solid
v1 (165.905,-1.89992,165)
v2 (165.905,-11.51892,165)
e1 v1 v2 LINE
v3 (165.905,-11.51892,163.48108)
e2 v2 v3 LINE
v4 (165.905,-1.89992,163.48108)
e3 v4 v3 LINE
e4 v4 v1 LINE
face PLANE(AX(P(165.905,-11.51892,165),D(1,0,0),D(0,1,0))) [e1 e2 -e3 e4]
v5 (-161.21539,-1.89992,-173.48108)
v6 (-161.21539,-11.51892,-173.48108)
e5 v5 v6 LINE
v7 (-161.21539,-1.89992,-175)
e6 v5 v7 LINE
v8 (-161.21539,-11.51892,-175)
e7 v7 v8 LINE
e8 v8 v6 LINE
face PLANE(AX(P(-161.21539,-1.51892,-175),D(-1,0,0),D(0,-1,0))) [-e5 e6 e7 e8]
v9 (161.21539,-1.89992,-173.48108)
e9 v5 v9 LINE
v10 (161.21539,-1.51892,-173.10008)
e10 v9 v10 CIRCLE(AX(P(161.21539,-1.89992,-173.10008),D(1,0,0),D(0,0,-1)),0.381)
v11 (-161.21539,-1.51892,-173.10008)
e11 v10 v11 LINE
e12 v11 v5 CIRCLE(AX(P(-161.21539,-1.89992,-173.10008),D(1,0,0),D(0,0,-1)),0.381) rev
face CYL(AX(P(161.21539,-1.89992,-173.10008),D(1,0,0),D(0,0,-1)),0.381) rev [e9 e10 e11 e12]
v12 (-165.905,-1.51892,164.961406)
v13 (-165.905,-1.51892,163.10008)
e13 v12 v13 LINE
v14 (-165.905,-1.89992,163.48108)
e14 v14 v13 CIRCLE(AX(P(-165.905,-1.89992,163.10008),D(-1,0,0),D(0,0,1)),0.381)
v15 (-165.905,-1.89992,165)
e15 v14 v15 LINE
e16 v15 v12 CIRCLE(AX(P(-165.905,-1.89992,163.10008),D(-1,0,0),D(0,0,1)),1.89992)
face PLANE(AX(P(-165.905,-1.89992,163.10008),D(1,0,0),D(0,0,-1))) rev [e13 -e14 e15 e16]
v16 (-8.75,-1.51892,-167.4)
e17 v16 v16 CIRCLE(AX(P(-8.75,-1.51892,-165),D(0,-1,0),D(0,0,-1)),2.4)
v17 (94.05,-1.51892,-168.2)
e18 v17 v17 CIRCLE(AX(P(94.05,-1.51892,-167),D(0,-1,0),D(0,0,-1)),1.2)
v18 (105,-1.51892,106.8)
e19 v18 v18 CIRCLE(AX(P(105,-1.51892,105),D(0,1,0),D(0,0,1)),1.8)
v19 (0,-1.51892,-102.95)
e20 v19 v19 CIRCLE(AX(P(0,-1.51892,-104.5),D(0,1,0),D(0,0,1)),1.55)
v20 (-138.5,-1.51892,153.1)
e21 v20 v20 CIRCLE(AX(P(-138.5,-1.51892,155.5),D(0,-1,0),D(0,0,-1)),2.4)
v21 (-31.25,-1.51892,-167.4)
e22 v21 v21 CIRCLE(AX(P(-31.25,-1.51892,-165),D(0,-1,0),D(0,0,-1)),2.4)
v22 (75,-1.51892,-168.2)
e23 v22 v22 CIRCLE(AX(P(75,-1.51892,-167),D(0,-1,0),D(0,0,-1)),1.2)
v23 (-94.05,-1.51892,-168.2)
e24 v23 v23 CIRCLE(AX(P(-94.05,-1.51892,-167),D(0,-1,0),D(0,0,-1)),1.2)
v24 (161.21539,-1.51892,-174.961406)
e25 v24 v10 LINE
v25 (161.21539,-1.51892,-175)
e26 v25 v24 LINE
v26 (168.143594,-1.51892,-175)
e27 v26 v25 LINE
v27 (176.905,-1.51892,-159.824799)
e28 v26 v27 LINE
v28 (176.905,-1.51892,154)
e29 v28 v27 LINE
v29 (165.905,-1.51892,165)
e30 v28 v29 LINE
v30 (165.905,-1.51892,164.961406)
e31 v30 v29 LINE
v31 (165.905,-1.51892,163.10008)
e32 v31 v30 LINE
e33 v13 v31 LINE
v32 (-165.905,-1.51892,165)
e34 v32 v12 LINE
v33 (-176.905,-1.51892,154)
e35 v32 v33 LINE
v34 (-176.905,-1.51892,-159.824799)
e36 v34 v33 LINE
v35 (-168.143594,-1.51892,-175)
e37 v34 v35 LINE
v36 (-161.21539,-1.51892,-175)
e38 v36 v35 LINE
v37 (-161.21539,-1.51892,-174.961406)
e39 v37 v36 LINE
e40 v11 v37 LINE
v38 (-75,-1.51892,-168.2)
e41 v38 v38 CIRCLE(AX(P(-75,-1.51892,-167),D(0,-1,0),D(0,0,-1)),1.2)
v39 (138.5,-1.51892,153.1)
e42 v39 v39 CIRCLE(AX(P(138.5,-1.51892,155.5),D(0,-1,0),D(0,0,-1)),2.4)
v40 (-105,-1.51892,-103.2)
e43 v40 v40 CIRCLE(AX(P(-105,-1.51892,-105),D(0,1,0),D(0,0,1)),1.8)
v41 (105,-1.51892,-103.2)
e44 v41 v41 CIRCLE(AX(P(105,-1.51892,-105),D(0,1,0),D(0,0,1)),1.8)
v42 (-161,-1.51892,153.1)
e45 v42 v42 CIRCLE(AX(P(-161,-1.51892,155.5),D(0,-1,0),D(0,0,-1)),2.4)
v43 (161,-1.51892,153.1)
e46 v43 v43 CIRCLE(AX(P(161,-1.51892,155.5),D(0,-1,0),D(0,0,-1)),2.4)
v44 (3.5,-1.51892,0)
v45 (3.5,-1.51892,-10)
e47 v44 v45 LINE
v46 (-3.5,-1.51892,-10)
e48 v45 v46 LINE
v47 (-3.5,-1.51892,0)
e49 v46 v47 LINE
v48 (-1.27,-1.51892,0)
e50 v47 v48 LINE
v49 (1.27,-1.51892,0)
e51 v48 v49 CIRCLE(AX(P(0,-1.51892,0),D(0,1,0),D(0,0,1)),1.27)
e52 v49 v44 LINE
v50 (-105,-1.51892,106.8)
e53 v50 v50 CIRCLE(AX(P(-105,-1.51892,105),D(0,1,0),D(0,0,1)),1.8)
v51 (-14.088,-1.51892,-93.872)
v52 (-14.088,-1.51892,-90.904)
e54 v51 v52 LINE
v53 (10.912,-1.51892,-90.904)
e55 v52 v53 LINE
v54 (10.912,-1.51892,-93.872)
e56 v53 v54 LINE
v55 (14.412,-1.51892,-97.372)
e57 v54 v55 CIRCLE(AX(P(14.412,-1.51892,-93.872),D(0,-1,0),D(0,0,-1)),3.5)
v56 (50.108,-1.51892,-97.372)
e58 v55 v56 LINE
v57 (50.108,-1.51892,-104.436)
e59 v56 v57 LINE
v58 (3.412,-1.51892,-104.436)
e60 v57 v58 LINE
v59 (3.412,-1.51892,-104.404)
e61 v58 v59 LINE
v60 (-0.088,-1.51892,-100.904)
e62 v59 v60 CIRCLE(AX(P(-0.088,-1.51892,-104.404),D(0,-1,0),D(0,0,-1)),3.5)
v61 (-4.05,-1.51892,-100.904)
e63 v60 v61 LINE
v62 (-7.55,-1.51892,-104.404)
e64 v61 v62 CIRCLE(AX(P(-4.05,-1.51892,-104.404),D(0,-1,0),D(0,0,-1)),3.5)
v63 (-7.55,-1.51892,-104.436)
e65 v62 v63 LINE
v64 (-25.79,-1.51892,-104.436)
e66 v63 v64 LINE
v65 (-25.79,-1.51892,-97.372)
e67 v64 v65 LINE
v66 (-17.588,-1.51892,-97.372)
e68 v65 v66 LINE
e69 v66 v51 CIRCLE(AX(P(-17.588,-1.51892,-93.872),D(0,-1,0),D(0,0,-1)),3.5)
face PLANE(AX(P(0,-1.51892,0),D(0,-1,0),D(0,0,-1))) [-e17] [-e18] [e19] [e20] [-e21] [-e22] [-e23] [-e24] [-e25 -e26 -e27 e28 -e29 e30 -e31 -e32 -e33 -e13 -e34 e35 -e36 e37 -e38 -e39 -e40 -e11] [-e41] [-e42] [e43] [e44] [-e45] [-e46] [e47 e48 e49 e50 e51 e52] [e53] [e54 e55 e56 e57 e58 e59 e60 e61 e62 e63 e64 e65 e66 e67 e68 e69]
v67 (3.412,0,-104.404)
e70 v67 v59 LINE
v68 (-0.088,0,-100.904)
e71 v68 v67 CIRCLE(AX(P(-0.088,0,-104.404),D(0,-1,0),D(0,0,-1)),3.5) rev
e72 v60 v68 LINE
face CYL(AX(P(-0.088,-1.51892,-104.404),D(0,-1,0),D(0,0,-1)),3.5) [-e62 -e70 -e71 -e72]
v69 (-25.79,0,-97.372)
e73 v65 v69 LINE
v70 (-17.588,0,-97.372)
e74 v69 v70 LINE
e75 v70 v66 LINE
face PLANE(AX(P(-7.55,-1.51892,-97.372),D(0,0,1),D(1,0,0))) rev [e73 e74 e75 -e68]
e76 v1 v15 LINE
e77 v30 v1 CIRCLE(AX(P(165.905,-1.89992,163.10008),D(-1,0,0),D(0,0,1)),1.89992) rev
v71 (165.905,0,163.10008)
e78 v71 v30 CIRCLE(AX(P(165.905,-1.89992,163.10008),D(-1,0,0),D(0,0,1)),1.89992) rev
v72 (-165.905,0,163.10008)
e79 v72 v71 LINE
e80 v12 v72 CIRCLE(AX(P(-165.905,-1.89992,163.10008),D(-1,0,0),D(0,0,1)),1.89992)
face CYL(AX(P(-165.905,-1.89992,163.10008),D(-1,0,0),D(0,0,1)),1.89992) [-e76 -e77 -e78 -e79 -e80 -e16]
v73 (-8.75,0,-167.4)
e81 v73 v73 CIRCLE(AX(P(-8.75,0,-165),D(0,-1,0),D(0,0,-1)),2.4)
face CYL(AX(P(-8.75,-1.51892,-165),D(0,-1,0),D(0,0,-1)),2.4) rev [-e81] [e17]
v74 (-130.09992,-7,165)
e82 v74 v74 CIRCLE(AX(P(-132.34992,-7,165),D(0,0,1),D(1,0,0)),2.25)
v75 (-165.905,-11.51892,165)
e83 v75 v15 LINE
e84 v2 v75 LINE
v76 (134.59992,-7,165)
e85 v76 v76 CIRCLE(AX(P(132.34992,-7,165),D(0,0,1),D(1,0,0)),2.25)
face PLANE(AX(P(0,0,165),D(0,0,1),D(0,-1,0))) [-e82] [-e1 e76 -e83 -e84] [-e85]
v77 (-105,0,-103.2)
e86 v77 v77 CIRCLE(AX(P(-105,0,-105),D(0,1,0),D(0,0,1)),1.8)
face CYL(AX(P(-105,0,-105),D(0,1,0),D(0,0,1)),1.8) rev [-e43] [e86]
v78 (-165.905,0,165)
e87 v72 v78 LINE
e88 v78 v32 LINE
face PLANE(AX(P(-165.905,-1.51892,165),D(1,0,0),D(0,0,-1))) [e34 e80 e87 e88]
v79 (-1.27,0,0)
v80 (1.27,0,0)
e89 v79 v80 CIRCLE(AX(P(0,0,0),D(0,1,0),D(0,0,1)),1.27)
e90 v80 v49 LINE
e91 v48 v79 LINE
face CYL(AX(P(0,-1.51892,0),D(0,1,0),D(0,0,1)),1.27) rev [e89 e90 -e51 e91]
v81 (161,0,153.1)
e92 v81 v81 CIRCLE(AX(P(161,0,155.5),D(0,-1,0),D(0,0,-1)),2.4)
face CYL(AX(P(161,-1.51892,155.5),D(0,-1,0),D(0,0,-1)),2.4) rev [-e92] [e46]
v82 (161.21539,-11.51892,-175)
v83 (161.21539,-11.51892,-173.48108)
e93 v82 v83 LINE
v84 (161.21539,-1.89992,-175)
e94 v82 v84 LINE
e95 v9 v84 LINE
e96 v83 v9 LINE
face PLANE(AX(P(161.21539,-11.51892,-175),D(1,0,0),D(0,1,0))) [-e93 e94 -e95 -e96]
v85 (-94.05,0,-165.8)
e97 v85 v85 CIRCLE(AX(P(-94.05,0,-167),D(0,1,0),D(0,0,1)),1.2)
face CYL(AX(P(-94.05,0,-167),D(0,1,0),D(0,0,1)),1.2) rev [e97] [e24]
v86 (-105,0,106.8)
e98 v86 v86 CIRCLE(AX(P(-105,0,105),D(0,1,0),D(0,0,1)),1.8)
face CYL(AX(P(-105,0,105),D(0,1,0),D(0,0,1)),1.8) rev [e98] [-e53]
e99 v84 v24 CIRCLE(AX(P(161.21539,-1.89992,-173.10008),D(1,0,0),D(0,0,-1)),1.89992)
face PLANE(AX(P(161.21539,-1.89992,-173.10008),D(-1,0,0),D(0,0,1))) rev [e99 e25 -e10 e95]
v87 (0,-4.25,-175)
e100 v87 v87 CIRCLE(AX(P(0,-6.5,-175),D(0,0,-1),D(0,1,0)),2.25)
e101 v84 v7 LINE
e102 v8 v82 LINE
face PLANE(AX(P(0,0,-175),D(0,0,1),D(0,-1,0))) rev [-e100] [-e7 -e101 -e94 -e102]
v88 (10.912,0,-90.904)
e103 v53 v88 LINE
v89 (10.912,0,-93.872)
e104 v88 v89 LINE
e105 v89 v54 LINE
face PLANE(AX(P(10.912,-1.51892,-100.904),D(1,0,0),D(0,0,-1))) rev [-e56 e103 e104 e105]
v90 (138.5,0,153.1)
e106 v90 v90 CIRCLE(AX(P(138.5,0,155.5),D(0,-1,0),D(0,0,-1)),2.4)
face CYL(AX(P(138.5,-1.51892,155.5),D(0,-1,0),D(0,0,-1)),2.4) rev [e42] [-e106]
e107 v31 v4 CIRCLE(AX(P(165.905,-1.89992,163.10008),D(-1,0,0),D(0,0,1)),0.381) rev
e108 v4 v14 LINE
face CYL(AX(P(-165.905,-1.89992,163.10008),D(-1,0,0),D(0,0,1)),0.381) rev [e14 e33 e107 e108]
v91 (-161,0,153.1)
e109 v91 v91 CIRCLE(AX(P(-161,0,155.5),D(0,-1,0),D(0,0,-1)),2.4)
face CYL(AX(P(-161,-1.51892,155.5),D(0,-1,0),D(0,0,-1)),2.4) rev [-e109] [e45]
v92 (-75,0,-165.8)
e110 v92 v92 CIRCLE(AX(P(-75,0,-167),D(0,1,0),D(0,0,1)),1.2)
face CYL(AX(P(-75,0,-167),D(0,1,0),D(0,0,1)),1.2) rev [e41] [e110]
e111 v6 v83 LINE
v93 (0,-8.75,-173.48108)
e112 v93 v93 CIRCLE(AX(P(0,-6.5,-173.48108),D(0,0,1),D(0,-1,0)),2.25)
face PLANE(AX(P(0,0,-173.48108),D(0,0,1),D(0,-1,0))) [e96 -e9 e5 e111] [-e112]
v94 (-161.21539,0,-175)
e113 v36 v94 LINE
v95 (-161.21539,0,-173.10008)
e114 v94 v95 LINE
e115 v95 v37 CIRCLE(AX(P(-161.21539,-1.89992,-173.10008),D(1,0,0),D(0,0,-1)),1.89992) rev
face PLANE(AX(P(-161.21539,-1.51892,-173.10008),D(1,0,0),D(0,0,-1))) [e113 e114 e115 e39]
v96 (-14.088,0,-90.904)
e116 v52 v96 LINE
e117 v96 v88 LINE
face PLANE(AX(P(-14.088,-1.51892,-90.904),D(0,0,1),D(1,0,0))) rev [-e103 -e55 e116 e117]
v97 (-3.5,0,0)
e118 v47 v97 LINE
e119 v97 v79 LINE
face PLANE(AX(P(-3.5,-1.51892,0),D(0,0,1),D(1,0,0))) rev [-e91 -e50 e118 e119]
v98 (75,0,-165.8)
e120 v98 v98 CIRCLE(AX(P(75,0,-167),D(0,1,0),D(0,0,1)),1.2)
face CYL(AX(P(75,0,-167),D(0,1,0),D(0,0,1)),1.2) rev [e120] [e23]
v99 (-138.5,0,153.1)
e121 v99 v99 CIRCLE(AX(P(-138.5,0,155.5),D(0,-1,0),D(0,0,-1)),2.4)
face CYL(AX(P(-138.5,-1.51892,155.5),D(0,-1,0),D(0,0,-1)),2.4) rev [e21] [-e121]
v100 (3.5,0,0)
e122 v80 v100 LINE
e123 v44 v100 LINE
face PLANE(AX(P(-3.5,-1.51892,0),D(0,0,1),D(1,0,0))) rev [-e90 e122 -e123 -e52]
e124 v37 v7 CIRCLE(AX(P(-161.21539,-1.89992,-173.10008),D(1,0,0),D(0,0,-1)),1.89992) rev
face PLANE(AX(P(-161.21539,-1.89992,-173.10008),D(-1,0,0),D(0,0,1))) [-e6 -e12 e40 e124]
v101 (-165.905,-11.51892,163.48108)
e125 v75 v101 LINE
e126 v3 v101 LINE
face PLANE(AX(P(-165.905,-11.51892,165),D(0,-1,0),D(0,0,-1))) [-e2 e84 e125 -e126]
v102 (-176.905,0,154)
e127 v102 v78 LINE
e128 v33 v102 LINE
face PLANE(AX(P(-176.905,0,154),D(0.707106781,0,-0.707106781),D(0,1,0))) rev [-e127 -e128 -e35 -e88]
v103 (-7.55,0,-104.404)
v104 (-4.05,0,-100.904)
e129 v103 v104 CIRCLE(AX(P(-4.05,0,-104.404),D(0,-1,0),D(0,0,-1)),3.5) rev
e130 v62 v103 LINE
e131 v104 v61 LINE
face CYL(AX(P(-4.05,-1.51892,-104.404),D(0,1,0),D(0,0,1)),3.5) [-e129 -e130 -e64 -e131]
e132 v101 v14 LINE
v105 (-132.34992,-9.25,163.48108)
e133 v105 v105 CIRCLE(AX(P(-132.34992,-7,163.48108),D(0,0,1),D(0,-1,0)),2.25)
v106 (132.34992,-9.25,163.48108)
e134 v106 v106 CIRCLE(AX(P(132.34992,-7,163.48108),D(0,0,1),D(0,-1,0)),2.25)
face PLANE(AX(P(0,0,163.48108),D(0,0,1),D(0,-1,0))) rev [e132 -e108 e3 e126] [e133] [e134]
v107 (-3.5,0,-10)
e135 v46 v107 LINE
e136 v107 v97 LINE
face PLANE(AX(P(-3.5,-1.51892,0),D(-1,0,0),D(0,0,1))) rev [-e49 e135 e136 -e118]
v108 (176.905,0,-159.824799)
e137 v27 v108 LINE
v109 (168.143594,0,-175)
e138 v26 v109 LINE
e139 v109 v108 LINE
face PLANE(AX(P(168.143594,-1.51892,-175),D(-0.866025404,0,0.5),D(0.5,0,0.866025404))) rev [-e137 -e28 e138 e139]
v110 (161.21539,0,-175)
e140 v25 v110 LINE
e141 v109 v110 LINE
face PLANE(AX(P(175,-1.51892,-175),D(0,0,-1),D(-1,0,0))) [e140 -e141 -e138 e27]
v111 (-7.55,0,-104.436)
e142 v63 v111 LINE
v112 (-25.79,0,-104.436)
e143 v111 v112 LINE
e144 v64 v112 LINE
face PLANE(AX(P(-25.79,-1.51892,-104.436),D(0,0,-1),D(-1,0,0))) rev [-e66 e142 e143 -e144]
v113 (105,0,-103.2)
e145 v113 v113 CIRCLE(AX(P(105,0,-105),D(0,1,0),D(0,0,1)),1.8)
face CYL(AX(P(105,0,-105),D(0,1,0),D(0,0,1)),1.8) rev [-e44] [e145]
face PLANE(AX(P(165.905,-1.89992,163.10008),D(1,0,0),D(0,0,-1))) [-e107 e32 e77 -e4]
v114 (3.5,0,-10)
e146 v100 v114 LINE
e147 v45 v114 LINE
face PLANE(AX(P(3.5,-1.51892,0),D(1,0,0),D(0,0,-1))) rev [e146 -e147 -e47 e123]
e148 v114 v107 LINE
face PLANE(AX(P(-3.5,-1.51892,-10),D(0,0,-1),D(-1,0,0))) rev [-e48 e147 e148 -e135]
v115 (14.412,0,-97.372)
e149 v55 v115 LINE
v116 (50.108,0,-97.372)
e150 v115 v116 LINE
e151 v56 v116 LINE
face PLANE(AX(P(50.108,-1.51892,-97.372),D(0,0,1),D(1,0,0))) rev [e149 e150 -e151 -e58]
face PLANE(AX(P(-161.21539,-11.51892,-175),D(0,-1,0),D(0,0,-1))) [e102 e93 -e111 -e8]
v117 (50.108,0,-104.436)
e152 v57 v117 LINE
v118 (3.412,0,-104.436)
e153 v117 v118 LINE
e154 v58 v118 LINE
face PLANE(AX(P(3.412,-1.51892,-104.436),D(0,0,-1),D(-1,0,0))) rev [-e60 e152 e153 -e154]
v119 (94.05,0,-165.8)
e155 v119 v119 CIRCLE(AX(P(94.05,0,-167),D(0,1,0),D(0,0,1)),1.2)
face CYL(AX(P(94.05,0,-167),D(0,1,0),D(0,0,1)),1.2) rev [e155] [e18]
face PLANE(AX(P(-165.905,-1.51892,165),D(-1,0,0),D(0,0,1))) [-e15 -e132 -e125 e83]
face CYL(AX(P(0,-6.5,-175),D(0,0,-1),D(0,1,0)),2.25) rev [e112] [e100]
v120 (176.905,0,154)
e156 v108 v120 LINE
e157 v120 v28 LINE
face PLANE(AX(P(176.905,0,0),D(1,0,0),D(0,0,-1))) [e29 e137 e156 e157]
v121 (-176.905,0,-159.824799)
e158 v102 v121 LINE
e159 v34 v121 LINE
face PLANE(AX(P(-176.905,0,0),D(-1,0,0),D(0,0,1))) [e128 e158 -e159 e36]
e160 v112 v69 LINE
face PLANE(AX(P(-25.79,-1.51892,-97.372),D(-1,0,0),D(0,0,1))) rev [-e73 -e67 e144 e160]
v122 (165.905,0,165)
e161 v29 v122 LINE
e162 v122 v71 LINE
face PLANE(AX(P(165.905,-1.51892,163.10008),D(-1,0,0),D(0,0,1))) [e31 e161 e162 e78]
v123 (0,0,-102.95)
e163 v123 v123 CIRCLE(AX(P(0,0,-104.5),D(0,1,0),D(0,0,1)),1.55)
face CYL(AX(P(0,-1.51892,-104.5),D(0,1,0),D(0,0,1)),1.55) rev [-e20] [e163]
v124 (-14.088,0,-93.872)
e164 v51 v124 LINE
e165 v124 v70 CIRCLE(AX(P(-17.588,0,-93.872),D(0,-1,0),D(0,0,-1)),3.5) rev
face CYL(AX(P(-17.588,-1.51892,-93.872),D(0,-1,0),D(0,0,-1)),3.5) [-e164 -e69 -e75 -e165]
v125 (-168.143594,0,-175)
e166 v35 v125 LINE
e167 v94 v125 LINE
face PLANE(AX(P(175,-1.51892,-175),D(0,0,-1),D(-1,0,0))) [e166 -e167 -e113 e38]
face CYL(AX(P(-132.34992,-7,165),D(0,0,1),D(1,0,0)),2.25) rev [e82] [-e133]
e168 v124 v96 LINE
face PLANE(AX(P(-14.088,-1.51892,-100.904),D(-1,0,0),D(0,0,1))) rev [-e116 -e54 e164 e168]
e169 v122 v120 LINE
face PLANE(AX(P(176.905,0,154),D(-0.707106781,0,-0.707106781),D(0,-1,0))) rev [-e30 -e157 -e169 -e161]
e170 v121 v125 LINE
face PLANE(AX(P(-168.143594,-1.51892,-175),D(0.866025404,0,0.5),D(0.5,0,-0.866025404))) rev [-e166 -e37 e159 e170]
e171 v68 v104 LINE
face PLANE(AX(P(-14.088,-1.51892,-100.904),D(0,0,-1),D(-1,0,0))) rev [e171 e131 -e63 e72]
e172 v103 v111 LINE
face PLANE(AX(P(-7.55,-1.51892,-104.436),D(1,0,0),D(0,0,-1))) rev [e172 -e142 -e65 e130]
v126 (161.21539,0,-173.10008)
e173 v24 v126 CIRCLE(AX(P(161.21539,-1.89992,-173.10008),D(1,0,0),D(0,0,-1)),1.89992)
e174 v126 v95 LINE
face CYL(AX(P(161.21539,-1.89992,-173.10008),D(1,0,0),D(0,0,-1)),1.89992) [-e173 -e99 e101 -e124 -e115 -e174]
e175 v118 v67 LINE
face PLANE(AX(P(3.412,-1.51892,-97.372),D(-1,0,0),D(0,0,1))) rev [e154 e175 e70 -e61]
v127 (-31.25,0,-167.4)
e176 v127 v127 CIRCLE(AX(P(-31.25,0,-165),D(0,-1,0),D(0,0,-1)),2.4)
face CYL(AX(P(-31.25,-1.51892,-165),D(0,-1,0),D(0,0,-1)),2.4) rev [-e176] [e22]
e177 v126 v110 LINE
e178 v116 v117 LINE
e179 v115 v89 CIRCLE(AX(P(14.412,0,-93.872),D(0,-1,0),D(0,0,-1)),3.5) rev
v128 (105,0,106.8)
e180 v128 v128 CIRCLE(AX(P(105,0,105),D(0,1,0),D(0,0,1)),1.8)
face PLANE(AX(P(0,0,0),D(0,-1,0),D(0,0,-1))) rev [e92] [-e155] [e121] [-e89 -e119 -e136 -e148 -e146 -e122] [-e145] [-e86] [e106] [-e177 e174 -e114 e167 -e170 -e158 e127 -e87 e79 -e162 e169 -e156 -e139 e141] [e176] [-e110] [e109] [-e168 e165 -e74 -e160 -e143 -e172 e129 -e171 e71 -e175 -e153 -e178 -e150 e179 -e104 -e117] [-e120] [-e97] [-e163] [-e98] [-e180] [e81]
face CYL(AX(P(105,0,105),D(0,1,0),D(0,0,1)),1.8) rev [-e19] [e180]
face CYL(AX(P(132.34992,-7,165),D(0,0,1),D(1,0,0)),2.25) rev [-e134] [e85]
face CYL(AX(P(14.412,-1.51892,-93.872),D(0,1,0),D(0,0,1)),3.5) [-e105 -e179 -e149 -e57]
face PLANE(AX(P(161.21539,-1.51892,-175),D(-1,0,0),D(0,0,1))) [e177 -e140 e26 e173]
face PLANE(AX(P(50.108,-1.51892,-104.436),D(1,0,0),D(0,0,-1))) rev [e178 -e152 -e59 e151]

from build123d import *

# Parameters (mm, degrees)
SKETCH1_W                      = 350
SKETCH1_H                      = 340
BASE_FLANGE1_DEPTH             = 1.51892
M3_CLEARANCE_HOLE1_D           = 3.6
M4_CLEARANCE_HOLE1_D           = 4.8
SKETCH41_W                     = 340
SKETCH41_H                     = 1.51892
BOSS_EXTRUDE4_DEPTH            = 1.905
SKETCH42_W                     = 340
SKETCH42_H                     = 1.51892
BOSS_EXTRUDE5_DEPTH            = 1.905
CUT_EXTRUDE3_DEPTH             = 1.51892
SKETCH51_R                     = 1.55
SKETCH51_R_2                   = 1.27
SKETCH51_W                     = 46.695999999
SKETCH51_H                     = 7.064
SKETCH51_W_2                   = 18.24
CUT_EXTRUDE4_DEPTH             = 1.51892
CHAMFER1_SIZE                  = 11
SKETCH62_W                     = 25
SKETCH62_H                     = 10
SKETCH62_W_2                   = 7
CUT_EXTRUDE6_DEPTH             = 1.51892
FILLET4_R                      = 3.5
EDGE_FLANGE4_STRIP_W           = 6.83768
EDGE_FLANGE4_STRIP_H           = 1.51892
EDGE_FLANGE4_STRIP_CUT_DEPTH   = 331.81
EDGE_FLANGE4_STRIP_2_W         = 6.83768
EDGE_FLANGE4_STRIP_2_H         = 1.51892
EDGE_FLANGE4_STRIP_CUT_2_DEPTH = 322.430780628
EDGE_FLANGE4_DEPTH             = 331.81
EDGE_FLANGE4_BEND_DEPTH        = 322.430780628
M2_CLEARANCE_HOLE1_D           = 2.4
M4_CLEARANCE_HOLE3_D           = 4.5
M4_CLEARANCE_HOLE3_DEPTH       = 11.5189
M4_CLEARANCE_HOLE3_TIP         = 1.351936393
M4_CLEARANCE_HOLE4_D           = 4.5
M4_CLEARANCE_HOLE4_DEPTH       = 11.5189
M4_CLEARANCE_HOLE4_TIP         = 1.351936393


# Sheet-metal steps are written as plain solids
with BuildPart() as part:
    # Sketch1 → Base-Flange1 (new body)
    with BuildSketch(Plane(origin=(0, 0, 0), x_dir=(1, 0, 0), z_dir=(0, 1, 0))):
        with Locations((0, 5)):
            Rectangle(SKETCH1_W, SKETCH1_H)
    extrude(amount=-BASE_FLANGE1_DEPTH)

    # M3 Clearance Hole1 (through all)
    with Locations(Plane(origin=(0, 0, 0), x_dir=(1, 0, 0), z_dir=(0, 1, 0))):
        with Locations((-105, 105), (105, 105), (105, -105), (-105, -105)):
            Hole(M3_CLEARANCE_HOLE1_D / 2)

    # M4 Clearance Hole1 (through all)
    with Locations(Plane(origin=(0, -1.51892, 0), x_dir=(-1, 0, 0), z_dir=(0, -1, 0))):
        with Locations((-161.000000003, -155.500000003), (31.25, 165), (8.75, 165), (138.500000003, -155.500000003), (161.000000003, -155.500000003), (-138.500000003, -155.500000003)):
            Hole(M4_CLEARANCE_HOLE1_D / 2)

    # Sketch41 → Boss-Extrude4 (add)
    with BuildSketch(Plane(origin=(175, 0, 0), x_dir=(0, 0, -1), z_dir=(1, 0, 0))):
        with Locations((5, -0.75946)):
            Rectangle(SKETCH41_W, SKETCH41_H)
    extrude(amount=BOSS_EXTRUDE4_DEPTH)

    # Sketch42 → Boss-Extrude5 (add)
    with BuildSketch(Plane.ZY.offset(175)):
        with Locations((-5, -0.75946)):
            Rectangle(SKETCH42_W, SKETCH42_H)
    extrude(amount=BOSS_EXTRUDE5_DEPTH)

    # Sketch50 → Cut-Extrude3 (cut)
    with BuildSketch(Plane(origin=(0, 0, 0), x_dir=(1, 0, 0), z_dir=(0, 1, 0))):
        Polygon((-176.905, 175), (-168.143593544, 175), (-176.905, 159.824798873), align=None)
        Polygon((168.143593544, 175), (176.905, 159.824798873), (176.905, 175), align=None)
    extrude(amount=-CUT_EXTRUDE3_DEPTH, mode=Mode.SUBTRACT)

    # Sketch51 → Cut-Extrude4 (cut)
    with BuildSketch(Plane(origin=(0, 0, 0), x_dir=(1, 0, 0), z_dir=(0, 1, 0))):
        with Locations(Location((0, 104.499999999, 0), (0, 0, 270))):
            Circle(SKETCH51_R)
        with Locations(Location((0, 0, 0), (0, 0, 270))):
            Circle(SKETCH51_R_2)
        with Locations((26.760000001, 100.904)):
            Rectangle(SKETCH51_W, SKETCH51_H)
        with Locations((-16.67, 100.904)):
            Rectangle(SKETCH51_W_2, SKETCH51_H)
    extrude(amount=-CUT_EXTRUDE4_DEPTH, mode=Mode.SUBTRACT)

    # Chamfer1
    chamfer1_edges = [part.edges().sort_by_distance(p)[0] for p in [
        (176.905, -0.75946, 165),
        (-176.905, -0.75946, 165),
    ]]
    chamfer(chamfer1_edges, length=CHAMFER1_SIZE)

    # Sketch62 → Cut-Extrude6 (cut)
    with BuildSketch(Plane(origin=(0, 0, 0), x_dir=(1, 0, 0), z_dir=(0, 1, 0))):
        with Locations((-1.587999999, 95.904)):
            Rectangle(SKETCH62_W, SKETCH62_H)
        with Locations((0, 5)):
            Rectangle(SKETCH62_W_2, SKETCH62_H)
    extrude(amount=-CUT_EXTRUDE6_DEPTH, mode=Mode.SUBTRACT)

    # Fillet4
    fillet4_edges = [part.edges().sort_by_distance(p)[0] for p in [
        (-14.087999999, -0.75946, -97.372),
        (-7.55, -0.75946, -100.904),
        (10.912000001, -0.75946, -97.372),
        (3.412000001, -0.75946, -100.904),
    ]]
    fillet(fillet4_edges, radius=FILLET4_R)

    # Edge-Flange4 strip (across the edge) → Edge-Flange4 strip cut (cut)
    with BuildSketch(Plane(origin=(165.905, -1.51892, 165), x_dir=(0, 0, -1), z_dir=(-1, 0, 0))):
        with Locations((-1.51892, -0.75946)):
            Rectangle(EDGE_FLANGE4_STRIP_W, EDGE_FLANGE4_STRIP_H)
    extrude(amount=EDGE_FLANGE4_STRIP_CUT_DEPTH, mode=Mode.SUBTRACT)

    # Edge-Flange4 strip 2 (across the edge) → Edge-Flange4 strip cut 2 (cut)
    with BuildSketch(Plane(origin=(-161.215390314, -1.51892, -175), x_dir=(0, 0, 1), z_dir=(1, 0, 0))):
        with Locations((-1.51892, -0.75946)):
            Rectangle(EDGE_FLANGE4_STRIP_2_W, EDGE_FLANGE4_STRIP_2_H)
    extrude(amount=EDGE_FLANGE4_STRIP_CUT_2_DEPTH, mode=Mode.SUBTRACT)

    # Edge-Flange4 section (across the edge) → Edge-Flange4 (add)
    with BuildSketch(Plane(origin=(165.905, -1.51892, 165), x_dir=(0, 0, -1), z_dir=(-1, 0, 0))):
        with BuildLine():
            Line((0, 0.381), (0, 10))
            Line((0, 10), (1.51892, 10))
            Line((1.51892, 10), (1.51892, 0.381))
            ThreePointArc((1.51892, 0.381), (1.630512316, 0.111592316), (1.89992, 0))
            Line((1.89992, 0), (1.89992, -1.51892))
            ThreePointArc((1.89992, -1.51892), (0.556473684, -0.962446316), (0, 0.381))
        make_face()
    extrude(amount=EDGE_FLANGE4_DEPTH)

    # Edge-Flange4 section 2 (across the edge) → Edge-Flange4 bend (add)
    with BuildSketch(Plane(origin=(-161.215390314, -1.51892, -175), x_dir=(0, 0, 1), z_dir=(1, 0, 0))):
        with BuildLine():
            Line((0, 0.381), (0, 10))
            Line((0, 10), (1.51892, 10))
            Line((1.51892, 10), (1.51892, 0.381))
            ThreePointArc((1.51892, 0.381), (1.630512316, 0.111592316), (1.89992, 0))
            Line((1.89992, 0), (1.89992, -1.51892))
            ThreePointArc((1.89992, -1.51892), (0.556473684, -0.962446316), (0, 0.381))
        make_face()
    extrude(amount=EDGE_FLANGE4_BEND_DEPTH)

    # M2 Clearance Hole1 (through all)
    with Locations(Plane(origin=(0, 0, 0), x_dir=(1, 0, 0), z_dir=(0, 1, 0))):
        with Locations((-94.05, 167), (-75, 167), (75, 167), (94.05, 167)):
            Hole(M2_CLEARANCE_HOLE1_D / 2)

    # M4 Clearance Hole3
    with Locations(Plane.XY.offset(165)):
        with Locations((132.349919958, -7), (-132.349919958, -7)):
            Hole(M4_CLEARANCE_HOLE3_D / 2, depth=M4_CLEARANCE_HOLE3_DEPTH)
            with Locations((0, 0, -(M4_CLEARANCE_HOLE3_DEPTH + M4_CLEARANCE_HOLE3_TIP / 2))):  # 118° drill point
                Cone(0, M4_CLEARANCE_HOLE3_D / 2, M4_CLEARANCE_HOLE3_TIP, mode=Mode.SUBTRACT)

    # M4 Clearance Hole4
    with Locations(Plane(origin=(0, 0, -175), x_dir=(-1, 0, 0), z_dir=(0, 0, -1))):
        with Locations((0, -6.5)):
            Hole(M4_CLEARANCE_HOLE4_D / 2, depth=M4_CLEARANCE_HOLE4_DEPTH)
            with Locations((0, 0, -(M4_CLEARANCE_HOLE4_DEPTH + M4_CLEARANCE_HOLE4_TIP / 2))):  # 118° drill point
                Cone(0, M4_CLEARANCE_HOLE4_D / 2, M4_CLEARANCE_HOLE4_TIP, mode=Mode.SUBTRACT)


solid = part.part
